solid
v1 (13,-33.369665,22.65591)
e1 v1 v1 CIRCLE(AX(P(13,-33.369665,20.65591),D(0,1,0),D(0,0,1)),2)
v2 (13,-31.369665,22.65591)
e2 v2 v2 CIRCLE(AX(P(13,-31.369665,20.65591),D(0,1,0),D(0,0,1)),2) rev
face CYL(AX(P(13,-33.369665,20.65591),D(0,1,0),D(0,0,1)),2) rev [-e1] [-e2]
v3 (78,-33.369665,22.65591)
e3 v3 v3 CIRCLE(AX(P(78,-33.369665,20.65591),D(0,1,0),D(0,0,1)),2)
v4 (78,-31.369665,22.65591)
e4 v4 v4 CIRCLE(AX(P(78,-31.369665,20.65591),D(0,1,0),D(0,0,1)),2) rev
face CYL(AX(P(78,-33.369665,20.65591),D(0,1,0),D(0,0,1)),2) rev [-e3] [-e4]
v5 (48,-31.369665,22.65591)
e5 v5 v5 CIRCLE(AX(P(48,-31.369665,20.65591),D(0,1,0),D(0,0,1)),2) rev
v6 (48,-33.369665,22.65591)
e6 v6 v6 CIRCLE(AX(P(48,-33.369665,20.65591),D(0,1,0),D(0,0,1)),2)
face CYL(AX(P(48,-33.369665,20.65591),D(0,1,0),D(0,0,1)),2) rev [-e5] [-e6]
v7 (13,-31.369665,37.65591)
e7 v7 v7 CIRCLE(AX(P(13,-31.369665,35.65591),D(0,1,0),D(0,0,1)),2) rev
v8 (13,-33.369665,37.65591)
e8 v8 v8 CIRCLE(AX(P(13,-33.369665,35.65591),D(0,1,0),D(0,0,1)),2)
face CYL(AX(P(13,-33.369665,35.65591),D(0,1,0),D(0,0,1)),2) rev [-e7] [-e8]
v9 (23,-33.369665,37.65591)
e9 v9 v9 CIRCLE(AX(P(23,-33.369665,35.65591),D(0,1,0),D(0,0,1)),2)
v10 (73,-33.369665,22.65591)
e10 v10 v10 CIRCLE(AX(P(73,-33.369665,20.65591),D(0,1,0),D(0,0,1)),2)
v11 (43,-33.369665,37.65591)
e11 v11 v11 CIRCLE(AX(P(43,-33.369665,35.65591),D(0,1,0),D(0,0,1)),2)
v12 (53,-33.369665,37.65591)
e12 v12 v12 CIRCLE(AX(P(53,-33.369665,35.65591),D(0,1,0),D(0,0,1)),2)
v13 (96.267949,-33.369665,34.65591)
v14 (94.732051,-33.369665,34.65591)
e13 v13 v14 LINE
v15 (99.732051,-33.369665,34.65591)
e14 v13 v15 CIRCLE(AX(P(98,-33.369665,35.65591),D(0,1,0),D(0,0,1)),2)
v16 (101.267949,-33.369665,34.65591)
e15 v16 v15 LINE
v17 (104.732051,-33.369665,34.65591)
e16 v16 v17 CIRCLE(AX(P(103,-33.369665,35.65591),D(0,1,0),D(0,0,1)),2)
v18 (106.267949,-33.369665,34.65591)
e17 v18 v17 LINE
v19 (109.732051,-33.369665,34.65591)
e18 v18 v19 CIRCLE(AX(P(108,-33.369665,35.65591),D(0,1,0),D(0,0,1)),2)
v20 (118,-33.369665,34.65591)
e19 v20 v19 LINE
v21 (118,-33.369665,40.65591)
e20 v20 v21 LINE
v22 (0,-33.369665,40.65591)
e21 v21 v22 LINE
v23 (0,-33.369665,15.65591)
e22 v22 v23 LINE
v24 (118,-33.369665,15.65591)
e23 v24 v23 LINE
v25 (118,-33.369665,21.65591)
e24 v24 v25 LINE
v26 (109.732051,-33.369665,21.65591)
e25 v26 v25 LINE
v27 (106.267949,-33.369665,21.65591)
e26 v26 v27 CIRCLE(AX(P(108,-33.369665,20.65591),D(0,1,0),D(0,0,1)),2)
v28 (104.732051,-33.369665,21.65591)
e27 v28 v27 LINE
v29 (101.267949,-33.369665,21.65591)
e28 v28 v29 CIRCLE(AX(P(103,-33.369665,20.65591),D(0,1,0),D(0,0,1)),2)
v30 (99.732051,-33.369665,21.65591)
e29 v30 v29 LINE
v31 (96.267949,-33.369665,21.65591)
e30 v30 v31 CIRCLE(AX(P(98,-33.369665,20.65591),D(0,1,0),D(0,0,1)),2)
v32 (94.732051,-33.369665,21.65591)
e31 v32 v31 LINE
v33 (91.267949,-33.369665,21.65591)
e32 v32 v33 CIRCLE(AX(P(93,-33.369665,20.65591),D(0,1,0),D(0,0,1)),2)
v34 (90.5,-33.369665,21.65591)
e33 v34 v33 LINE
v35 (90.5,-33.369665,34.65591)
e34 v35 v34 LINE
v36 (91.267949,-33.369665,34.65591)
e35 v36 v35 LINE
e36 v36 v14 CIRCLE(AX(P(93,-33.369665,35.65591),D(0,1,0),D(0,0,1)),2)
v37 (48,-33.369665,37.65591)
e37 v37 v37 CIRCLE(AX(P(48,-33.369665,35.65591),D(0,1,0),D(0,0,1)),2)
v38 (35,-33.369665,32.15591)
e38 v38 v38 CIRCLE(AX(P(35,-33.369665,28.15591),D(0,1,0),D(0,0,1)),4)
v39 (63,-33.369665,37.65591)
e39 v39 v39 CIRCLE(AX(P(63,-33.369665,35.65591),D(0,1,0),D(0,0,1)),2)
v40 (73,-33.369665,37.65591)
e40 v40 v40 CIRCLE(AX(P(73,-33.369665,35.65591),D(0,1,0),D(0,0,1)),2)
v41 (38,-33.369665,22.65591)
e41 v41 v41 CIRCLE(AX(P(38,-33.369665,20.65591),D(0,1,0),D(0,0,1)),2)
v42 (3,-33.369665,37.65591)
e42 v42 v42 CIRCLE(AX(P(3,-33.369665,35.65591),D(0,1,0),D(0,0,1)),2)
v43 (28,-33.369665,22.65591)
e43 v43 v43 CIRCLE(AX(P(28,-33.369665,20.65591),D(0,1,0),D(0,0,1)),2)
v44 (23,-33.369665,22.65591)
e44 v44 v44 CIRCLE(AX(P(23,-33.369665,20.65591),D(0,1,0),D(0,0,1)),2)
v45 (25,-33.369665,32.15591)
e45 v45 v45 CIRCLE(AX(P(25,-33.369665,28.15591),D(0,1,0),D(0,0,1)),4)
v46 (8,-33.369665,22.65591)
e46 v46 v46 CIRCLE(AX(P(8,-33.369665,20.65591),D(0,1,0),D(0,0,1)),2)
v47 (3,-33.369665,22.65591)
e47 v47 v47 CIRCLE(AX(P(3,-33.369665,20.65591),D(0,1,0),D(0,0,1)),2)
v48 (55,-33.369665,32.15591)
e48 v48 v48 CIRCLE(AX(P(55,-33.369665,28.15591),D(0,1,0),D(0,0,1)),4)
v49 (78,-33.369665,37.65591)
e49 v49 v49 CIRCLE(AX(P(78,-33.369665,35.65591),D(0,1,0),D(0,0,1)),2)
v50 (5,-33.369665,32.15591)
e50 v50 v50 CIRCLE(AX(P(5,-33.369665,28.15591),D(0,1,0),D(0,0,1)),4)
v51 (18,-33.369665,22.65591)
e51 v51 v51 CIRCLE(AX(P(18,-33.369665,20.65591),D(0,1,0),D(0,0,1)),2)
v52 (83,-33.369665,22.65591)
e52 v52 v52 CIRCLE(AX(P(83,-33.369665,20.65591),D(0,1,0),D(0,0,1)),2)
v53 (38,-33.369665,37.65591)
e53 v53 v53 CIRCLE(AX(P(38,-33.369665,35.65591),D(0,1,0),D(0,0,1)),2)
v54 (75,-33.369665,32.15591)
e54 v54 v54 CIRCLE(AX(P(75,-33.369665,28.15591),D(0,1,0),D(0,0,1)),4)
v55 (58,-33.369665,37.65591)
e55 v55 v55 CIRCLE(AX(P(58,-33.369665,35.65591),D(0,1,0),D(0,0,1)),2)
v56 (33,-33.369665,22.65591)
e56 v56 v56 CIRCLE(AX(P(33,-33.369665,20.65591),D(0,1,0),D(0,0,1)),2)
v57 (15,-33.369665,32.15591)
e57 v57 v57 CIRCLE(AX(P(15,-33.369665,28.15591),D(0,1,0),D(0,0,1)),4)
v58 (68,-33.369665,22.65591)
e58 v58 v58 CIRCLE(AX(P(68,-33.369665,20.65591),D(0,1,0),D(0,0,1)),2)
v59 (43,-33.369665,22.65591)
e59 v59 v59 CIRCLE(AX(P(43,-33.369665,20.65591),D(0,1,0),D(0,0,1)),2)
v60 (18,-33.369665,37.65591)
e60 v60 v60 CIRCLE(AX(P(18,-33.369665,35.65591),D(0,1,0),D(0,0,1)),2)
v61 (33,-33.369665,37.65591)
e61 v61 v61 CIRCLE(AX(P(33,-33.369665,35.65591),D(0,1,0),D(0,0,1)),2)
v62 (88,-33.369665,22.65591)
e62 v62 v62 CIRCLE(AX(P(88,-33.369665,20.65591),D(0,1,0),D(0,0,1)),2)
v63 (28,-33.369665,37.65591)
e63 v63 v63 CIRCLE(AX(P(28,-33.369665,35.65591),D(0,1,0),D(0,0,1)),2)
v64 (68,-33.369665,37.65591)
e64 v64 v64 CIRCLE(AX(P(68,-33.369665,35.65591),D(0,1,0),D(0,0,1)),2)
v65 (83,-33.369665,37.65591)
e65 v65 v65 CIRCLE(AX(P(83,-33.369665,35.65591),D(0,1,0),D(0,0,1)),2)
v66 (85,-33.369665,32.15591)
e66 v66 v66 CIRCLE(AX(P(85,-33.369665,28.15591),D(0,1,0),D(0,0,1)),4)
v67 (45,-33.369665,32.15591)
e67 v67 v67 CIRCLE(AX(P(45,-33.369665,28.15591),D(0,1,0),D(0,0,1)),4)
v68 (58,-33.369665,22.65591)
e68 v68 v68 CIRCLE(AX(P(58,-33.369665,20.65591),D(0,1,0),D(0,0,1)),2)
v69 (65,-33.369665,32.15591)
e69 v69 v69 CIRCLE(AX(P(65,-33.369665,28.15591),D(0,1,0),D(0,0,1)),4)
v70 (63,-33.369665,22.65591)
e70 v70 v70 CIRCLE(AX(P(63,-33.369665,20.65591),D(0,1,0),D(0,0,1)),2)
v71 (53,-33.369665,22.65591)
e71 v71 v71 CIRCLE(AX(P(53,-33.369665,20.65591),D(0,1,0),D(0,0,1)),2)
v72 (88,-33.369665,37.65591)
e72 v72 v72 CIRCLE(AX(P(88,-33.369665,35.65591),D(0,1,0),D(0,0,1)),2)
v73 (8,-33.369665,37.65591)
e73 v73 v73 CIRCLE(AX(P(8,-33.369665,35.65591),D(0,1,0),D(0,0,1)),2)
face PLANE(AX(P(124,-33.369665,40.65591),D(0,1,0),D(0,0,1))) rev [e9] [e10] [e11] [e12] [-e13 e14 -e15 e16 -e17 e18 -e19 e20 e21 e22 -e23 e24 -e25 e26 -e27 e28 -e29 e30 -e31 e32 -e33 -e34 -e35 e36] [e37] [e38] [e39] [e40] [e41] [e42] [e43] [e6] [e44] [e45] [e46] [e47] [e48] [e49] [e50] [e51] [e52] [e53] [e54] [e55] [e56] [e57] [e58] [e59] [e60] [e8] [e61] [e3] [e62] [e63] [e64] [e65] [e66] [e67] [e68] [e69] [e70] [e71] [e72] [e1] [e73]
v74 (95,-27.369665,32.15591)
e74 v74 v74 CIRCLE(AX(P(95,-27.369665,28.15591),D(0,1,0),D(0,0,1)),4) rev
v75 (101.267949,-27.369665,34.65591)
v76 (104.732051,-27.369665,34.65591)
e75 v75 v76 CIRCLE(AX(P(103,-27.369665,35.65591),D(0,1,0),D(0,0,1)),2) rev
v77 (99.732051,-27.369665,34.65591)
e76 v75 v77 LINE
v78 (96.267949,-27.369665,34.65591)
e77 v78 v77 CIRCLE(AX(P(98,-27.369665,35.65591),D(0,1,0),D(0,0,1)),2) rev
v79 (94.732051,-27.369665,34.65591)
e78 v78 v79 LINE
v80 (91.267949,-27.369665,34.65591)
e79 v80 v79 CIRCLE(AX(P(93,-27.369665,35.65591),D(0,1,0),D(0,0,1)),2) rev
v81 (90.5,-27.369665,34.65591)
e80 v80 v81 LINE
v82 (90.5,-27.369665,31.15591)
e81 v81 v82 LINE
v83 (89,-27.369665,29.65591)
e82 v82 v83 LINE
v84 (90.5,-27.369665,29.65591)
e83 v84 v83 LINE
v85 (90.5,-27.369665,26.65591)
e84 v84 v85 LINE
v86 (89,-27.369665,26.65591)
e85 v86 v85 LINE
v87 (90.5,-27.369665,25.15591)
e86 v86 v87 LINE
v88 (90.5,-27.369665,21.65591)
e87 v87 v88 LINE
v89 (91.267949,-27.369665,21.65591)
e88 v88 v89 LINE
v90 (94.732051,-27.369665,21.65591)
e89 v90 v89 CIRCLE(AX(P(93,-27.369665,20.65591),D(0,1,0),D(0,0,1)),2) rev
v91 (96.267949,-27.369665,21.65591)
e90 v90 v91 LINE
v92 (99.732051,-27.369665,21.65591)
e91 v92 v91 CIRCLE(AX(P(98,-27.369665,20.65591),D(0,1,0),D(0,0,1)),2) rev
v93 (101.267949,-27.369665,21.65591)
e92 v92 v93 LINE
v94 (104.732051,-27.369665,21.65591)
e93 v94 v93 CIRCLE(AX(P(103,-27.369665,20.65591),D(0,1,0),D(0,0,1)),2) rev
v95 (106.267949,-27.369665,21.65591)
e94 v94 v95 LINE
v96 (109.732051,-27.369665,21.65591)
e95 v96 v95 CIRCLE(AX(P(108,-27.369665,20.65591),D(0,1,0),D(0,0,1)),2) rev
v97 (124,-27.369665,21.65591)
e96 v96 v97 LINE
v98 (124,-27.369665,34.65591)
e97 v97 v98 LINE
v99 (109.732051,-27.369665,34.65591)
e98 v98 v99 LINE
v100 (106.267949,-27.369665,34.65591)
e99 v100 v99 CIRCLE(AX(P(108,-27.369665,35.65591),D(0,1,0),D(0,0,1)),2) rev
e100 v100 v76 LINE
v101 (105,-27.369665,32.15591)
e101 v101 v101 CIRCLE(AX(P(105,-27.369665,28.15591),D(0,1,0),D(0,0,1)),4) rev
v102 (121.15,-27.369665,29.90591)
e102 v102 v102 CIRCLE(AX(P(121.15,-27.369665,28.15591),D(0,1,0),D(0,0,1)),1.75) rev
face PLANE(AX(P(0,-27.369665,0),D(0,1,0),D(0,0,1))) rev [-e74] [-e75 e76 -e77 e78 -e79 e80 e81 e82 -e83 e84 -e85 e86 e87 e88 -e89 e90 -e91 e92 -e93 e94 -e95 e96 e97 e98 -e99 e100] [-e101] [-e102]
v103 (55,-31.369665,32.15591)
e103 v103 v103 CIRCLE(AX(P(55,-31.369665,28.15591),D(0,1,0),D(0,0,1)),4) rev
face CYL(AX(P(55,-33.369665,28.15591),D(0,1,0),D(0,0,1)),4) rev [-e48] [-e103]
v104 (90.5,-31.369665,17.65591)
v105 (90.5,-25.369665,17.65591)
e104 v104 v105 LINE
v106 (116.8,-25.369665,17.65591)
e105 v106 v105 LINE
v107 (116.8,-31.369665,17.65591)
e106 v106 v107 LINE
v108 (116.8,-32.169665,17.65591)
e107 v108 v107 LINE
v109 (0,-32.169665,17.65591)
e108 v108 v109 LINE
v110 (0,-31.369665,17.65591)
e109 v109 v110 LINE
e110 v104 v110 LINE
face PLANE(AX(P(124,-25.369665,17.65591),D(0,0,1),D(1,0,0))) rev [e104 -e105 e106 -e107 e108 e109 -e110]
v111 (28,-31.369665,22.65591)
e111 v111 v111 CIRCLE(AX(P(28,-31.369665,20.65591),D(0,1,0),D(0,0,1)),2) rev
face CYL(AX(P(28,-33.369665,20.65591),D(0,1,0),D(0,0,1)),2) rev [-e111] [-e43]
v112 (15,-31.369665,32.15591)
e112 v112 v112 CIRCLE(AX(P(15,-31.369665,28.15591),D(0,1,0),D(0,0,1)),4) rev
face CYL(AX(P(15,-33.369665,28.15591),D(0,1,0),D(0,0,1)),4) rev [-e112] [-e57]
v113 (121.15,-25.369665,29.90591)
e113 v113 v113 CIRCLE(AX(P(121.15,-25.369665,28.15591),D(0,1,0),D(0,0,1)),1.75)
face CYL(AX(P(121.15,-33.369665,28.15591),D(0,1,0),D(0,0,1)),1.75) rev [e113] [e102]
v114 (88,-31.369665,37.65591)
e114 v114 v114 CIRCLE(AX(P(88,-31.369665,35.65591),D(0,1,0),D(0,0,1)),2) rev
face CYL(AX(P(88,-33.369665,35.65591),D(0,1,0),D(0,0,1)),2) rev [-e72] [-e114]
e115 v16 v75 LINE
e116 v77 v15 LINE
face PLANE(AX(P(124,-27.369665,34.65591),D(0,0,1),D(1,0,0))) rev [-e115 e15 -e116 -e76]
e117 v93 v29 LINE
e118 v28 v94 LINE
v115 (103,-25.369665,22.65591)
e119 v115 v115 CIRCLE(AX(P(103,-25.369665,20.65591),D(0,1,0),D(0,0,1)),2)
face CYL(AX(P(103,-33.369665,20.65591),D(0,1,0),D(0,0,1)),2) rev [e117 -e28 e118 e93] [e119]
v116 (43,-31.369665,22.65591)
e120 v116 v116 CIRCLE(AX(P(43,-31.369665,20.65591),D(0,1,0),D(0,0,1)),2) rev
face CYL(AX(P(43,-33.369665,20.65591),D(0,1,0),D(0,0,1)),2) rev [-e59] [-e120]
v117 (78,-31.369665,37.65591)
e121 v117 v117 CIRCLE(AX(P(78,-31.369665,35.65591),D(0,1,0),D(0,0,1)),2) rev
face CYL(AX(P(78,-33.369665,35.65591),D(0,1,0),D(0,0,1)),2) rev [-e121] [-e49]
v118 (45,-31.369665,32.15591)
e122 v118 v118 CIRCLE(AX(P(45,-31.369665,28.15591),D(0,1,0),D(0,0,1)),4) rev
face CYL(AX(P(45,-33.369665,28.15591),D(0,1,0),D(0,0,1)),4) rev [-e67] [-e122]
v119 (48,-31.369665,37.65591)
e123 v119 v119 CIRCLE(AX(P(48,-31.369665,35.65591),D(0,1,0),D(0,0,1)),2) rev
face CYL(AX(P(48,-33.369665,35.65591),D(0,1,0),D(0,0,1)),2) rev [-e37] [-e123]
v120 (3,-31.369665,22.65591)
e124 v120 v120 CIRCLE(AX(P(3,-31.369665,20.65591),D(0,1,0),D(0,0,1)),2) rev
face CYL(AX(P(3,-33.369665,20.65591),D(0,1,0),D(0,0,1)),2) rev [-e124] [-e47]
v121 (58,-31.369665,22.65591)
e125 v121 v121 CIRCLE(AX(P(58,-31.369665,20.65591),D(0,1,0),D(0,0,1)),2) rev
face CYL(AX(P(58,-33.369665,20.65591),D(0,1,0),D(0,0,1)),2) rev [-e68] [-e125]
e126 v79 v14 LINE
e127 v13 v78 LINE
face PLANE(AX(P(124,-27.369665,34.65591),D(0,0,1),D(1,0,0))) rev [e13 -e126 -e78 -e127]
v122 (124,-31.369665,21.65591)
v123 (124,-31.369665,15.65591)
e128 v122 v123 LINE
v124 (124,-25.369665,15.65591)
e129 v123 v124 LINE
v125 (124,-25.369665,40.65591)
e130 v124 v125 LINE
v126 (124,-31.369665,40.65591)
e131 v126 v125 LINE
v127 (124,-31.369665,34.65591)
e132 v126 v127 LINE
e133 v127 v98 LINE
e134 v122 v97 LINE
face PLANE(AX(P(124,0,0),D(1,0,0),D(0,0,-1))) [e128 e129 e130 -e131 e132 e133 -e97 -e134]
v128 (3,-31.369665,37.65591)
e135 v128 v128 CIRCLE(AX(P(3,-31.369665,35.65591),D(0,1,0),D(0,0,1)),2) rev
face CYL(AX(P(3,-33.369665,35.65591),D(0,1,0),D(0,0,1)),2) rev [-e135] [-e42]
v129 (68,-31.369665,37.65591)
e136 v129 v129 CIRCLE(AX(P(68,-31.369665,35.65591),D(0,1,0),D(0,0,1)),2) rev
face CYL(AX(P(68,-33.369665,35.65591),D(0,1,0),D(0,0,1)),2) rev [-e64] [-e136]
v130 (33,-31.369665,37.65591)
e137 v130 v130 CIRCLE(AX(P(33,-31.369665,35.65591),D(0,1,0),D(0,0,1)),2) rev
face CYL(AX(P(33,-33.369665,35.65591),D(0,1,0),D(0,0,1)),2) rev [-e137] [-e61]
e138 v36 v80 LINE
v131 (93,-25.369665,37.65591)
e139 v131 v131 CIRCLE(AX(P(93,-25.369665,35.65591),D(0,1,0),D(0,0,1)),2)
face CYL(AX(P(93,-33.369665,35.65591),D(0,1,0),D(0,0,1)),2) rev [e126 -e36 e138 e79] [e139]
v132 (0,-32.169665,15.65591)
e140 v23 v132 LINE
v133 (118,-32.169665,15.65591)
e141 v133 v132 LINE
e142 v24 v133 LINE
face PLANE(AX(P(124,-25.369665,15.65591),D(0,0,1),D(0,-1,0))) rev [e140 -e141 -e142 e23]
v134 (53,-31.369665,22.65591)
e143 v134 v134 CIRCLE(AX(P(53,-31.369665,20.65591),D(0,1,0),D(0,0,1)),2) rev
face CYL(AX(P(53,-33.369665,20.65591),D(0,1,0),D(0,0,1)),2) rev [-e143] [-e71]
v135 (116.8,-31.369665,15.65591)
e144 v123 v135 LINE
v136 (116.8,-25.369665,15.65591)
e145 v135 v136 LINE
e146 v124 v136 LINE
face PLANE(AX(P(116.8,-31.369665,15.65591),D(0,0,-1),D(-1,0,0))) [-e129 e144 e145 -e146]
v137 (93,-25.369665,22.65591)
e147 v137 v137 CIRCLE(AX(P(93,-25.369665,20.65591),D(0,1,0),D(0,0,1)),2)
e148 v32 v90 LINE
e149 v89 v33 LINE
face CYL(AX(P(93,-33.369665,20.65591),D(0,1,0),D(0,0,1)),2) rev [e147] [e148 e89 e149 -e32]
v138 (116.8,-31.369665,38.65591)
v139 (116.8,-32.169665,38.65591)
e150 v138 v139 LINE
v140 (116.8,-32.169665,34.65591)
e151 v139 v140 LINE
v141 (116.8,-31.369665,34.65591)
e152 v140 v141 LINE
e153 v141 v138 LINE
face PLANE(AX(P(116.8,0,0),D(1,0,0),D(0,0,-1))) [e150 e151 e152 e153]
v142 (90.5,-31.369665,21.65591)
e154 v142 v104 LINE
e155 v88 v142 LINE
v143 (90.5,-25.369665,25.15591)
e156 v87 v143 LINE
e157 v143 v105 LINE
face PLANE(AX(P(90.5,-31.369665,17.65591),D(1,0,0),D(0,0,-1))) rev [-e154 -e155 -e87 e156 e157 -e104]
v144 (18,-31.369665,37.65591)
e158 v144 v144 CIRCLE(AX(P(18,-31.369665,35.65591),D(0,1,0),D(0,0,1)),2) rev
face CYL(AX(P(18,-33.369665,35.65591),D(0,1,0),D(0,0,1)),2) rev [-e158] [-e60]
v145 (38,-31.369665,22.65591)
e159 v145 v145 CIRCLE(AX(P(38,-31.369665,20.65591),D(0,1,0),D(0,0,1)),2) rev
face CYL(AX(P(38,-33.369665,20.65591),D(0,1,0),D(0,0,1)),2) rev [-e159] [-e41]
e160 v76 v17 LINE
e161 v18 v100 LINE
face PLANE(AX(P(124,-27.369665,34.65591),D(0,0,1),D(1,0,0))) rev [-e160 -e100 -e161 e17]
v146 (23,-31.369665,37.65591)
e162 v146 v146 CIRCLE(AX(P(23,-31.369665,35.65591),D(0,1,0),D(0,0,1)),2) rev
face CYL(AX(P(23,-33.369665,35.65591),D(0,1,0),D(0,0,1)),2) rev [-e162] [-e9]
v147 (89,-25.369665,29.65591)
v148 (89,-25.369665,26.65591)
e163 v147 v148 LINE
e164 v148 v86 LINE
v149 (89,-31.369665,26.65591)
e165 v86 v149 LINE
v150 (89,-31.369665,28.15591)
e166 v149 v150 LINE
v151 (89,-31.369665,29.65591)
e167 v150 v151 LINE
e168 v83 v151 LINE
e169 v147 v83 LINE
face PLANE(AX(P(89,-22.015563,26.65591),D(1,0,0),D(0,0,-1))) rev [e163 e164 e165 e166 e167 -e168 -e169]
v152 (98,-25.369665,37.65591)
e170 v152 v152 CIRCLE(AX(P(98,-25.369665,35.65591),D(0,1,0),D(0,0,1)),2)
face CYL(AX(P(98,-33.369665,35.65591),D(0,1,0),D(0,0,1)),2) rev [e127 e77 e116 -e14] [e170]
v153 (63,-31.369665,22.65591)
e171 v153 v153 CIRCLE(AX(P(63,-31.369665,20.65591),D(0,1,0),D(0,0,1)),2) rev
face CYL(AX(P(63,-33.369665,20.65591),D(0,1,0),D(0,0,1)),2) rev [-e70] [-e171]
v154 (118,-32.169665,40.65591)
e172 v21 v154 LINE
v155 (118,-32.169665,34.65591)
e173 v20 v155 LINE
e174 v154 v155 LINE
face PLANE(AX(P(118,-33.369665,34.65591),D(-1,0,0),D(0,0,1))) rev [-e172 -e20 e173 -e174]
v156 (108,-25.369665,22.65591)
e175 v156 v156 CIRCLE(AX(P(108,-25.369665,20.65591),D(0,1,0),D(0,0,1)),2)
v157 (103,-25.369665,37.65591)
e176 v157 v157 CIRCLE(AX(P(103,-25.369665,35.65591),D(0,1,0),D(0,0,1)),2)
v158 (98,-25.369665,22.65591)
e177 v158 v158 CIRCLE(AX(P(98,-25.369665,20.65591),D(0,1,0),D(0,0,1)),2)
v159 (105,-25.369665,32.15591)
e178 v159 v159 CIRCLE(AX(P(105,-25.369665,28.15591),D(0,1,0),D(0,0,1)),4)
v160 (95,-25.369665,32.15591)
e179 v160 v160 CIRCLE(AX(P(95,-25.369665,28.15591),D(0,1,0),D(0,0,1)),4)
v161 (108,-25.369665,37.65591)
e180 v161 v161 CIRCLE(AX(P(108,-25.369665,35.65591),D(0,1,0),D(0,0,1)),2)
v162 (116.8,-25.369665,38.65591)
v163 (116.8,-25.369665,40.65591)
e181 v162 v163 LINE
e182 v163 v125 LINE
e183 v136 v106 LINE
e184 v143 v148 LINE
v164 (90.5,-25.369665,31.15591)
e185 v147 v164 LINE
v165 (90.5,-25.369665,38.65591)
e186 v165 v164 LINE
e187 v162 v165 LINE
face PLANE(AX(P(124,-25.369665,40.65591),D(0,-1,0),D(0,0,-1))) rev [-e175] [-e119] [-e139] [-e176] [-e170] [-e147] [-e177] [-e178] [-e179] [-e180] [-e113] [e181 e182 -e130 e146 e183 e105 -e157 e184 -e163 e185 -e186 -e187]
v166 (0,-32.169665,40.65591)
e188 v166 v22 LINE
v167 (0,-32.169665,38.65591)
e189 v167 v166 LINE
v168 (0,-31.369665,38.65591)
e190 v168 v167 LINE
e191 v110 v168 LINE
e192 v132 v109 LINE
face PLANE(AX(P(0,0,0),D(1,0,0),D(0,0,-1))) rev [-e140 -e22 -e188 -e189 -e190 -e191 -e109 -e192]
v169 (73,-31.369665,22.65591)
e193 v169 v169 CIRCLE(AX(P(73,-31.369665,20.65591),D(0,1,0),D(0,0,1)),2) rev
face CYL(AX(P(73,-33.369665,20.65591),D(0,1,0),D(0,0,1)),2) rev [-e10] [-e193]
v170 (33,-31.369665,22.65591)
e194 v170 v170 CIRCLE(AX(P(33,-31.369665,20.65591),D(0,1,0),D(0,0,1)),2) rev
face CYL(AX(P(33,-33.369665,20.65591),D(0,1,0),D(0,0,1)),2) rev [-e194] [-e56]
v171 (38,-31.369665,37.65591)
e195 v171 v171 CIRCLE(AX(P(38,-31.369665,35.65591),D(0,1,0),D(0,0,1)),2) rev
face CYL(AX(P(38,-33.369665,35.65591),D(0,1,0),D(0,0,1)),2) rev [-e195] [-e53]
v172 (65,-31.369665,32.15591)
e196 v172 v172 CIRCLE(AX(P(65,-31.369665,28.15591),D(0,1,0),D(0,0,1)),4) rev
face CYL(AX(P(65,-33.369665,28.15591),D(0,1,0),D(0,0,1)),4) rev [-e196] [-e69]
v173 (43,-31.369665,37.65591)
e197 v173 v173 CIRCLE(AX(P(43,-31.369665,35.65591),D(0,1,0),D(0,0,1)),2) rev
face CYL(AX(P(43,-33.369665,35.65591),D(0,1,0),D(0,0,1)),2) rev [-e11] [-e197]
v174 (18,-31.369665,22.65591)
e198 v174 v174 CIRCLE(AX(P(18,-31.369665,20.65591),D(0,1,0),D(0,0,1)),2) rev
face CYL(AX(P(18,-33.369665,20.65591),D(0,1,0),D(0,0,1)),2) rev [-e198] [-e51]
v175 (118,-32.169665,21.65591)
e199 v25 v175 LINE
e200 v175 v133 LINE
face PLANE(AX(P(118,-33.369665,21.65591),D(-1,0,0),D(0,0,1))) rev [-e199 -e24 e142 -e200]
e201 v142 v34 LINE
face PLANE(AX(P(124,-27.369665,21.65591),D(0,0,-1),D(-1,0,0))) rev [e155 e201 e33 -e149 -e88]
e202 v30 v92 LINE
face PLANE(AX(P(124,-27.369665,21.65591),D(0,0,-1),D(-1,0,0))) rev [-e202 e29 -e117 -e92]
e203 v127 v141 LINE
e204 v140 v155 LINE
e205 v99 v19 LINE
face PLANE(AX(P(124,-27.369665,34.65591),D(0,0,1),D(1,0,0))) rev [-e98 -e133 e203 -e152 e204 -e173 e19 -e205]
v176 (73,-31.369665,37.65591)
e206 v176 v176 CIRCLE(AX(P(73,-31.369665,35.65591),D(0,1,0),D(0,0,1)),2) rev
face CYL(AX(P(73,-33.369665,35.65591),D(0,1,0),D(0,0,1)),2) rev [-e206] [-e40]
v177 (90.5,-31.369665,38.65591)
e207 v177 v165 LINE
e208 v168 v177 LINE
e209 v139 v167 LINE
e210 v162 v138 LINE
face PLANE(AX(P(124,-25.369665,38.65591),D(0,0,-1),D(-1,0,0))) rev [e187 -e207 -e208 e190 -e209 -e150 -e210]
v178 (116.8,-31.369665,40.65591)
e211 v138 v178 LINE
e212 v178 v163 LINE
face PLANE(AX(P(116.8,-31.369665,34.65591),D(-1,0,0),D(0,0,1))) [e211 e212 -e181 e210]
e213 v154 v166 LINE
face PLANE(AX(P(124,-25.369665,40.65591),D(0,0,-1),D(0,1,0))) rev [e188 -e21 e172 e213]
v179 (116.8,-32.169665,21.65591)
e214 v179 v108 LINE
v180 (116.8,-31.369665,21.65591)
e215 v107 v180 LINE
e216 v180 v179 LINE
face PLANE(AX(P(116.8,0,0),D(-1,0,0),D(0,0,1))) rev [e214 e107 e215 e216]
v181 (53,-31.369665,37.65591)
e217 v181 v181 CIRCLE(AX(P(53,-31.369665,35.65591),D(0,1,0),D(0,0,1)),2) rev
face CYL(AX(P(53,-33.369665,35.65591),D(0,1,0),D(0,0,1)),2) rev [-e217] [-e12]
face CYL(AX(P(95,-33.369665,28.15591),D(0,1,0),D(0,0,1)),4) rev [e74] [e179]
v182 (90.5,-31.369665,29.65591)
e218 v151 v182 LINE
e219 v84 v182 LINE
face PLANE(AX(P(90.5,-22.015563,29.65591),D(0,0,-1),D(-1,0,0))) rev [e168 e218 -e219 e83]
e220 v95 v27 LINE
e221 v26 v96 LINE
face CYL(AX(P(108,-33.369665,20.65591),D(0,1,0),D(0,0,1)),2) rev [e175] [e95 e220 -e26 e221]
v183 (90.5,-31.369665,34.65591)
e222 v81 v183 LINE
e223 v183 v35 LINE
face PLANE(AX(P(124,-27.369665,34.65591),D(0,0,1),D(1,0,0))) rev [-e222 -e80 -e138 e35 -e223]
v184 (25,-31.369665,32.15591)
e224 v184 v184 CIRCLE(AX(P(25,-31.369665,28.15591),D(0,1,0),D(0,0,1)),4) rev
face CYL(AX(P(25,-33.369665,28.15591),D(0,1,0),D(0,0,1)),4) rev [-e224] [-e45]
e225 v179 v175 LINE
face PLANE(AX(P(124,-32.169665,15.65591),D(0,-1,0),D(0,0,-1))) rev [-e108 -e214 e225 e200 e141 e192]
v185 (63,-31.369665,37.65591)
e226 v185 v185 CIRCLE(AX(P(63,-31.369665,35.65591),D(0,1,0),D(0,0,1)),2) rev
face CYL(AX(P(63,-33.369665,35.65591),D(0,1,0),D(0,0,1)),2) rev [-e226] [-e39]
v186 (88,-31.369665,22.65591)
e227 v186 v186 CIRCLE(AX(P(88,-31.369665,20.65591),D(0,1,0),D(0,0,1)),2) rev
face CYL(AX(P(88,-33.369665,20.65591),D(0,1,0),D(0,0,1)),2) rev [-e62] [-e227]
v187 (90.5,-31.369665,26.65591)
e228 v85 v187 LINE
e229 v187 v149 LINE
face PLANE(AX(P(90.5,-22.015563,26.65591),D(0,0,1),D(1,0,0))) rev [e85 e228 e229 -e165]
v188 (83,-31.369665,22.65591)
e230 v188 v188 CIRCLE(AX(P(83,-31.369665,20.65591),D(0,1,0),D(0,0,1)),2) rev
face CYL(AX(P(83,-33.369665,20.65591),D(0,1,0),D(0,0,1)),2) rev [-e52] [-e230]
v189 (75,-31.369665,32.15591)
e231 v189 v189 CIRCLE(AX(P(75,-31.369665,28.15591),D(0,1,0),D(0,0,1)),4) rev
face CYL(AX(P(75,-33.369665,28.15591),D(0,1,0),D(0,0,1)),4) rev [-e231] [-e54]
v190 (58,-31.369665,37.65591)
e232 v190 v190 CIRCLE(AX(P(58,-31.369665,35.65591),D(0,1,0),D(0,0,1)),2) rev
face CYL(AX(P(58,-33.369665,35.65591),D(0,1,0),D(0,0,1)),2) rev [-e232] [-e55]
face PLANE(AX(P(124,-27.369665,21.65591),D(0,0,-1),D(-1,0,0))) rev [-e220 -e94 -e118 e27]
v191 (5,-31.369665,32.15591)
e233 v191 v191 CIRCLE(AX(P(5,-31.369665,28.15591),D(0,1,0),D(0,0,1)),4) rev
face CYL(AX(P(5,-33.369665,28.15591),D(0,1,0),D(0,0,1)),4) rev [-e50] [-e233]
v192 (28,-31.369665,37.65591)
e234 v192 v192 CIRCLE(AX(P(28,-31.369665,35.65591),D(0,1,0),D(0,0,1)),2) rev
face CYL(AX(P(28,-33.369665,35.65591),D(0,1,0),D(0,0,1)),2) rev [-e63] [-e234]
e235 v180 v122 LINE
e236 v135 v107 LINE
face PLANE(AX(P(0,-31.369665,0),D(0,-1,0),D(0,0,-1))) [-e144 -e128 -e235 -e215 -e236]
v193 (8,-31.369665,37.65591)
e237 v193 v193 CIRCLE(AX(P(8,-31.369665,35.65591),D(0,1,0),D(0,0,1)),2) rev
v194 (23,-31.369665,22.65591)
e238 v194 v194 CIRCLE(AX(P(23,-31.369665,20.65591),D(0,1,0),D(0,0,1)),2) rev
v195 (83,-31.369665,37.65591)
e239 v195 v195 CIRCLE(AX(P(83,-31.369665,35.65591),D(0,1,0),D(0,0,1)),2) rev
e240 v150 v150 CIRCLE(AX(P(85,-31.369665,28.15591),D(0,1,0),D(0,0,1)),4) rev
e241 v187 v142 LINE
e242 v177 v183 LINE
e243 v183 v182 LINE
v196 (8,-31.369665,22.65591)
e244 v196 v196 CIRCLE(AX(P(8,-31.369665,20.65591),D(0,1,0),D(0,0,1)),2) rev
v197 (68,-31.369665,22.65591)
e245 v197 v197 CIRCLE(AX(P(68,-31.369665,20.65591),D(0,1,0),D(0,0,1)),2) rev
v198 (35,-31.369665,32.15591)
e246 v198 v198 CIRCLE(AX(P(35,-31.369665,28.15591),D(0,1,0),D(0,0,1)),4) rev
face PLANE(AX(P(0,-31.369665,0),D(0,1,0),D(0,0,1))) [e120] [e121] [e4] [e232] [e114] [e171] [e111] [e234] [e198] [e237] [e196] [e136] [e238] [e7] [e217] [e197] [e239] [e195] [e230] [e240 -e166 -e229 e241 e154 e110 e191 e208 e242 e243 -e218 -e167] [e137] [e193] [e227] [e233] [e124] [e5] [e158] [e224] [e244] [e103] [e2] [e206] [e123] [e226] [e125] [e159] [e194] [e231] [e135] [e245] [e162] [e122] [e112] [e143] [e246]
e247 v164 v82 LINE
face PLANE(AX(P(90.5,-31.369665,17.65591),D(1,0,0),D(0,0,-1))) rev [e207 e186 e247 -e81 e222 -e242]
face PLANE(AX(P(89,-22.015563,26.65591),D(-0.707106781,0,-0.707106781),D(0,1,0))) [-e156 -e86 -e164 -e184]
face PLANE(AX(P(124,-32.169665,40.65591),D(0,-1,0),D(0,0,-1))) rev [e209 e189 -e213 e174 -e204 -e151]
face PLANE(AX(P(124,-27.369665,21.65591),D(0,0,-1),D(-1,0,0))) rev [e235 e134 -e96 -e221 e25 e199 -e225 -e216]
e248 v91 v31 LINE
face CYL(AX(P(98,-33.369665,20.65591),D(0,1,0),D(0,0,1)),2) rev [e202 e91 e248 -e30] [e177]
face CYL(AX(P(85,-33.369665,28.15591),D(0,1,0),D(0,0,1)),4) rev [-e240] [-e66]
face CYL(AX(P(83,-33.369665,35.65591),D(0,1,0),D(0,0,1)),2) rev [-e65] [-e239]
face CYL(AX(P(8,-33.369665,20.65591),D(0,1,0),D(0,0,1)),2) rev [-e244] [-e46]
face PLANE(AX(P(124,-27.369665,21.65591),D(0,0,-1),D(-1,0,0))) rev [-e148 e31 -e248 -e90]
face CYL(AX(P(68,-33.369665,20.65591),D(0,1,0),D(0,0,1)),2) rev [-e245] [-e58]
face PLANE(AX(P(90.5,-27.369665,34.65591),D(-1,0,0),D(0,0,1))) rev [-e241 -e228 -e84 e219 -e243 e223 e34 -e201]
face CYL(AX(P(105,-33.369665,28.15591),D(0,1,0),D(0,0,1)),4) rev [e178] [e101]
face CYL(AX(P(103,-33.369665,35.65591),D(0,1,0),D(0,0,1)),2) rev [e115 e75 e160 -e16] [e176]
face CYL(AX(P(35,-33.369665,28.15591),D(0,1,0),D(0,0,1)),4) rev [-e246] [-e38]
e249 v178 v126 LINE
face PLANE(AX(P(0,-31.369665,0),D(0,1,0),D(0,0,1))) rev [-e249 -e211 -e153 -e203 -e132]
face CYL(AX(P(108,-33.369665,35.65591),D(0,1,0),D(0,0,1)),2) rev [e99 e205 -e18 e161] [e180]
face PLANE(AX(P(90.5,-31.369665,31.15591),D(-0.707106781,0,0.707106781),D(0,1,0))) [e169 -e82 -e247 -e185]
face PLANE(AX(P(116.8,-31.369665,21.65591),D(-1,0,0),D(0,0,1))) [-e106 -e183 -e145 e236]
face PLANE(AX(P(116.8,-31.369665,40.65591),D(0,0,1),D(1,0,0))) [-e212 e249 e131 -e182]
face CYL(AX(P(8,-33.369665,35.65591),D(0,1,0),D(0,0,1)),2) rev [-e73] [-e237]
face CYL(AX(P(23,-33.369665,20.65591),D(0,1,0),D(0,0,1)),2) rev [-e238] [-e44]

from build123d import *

# Parameters (mm, degrees)
SKIZZE1_W                       = 25
SKIZZE1_H                       = 8
AUFSATZ_LINEAR_AUSTRAGEN1_DEPTH = 124
SKIZZE2_W                       = 2
SKIZZE2_H                       = 6.8
SCHNITT_LINEAR_AUSTRAGEN1_DEPTH = 135.693866119
SKIZZE3_R                       = 1.75
SKIZZE3_W                       = 6
SKIZZE3_H                       = 6
SCHNITT_LINEAR_AUSTRAGEN2_DEPTH = 131.739829541
SKIZZE4_W                       = 4
SKIZZE4_H                       = 6.8
SCHNITT_LINEAR_AUSTRAGEN3_DEPTH = 1.2
SKIZZE5_R                       = 2
SKIZZE5_R_2                     = 4
SCHNITT_LINEAR_AUSTRAGEN4_DEPTH = 131.739829541
LINEARES_MUSTER1_COUNT          = 11
LINEARES_MUSTER1_PITCH          = 10
SKIZZE6_W                       = 90.5
SKIZZE6_H                       = 21
SCHNITT_LINEAR_AUSTRAGEN5_DEPTH = 6
SKIZZE7_W                       = 33.5
SKIZZE7_H                       = 13
SCHNITT_LINEAR_AUSTRAGEN6_DEPTH = 6
SKIZZE8_W                       = 7.2
SKIZZE8_H                       = 6
AUFSATZ_LINEAR_AUSTRAGEN2_DEPTH = 6
AUFSATZ_LINEAR_AUSTRAGEN3_REACH = 132.633
SKIZZE9_W                       = 1.5
SKIZZE9_H                       = 3
FASE1_SIZE                      = 1.5


with BuildPart() as part:
    # Skizze1 → Aufsatz-Linear austragen1 (new body)
    with BuildSketch(Plane(origin=(0, 0, 0), x_dir=(0, 0, -1), z_dir=(1, 0, 0))):
        with Locations((-28.15591013, -29.369664989)):
            Rectangle(SKIZZE1_W, SKIZZE1_H)
    extrude(amount=AUFSATZ_LINEAR_AUSTRAGEN1_DEPTH)

    # Skizze2 → Schnitt-Linear austragen1 (cut, through all)
    with BuildSketch(Plane.ZY):
        with Locations((16.65591013, -28.769664989)):
            Rectangle(SKIZZE2_W, SKIZZE2_H)
        with Locations((39.65591013, -28.769664989)):
            Rectangle(SKIZZE2_W, SKIZZE2_H)
    extrude(amount=-SCHNITT_LINEAR_AUSTRAGEN1_DEPTH, mode=Mode.SUBTRACT)

    # Skizze3 → Schnitt-Linear austragen2 (cut, through all)
    with BuildSketch(Plane(origin=(0, -25.369664989, 0), x_dir=(1, 0, 0), z_dir=(0, 1, 0))):
        with Locations(Location((121.15, -28.15591013, 0), (0, 0, 270))):
            Circle(SKIZZE3_R)
        with Locations((121, -18.65591013)):
            Rectangle(SKIZZE3_W, SKIZZE3_H)
        with Locations((121, -37.65591013)):
            Rectangle(SKIZZE3_W, SKIZZE3_H)
    extrude(amount=-SCHNITT_LINEAR_AUSTRAGEN2_DEPTH, mode=Mode.SUBTRACT)

    # Skizze4 → Schnitt-Linear austragen3 (cut)
    with BuildSketch(Plane(origin=(118, 0, 0), x_dir=(0, 0, -1), z_dir=(1, 0, 0))):
        with Locations((-36.65591013, -28.769664989)):
            Rectangle(SKIZZE4_W, SKIZZE4_H)
        with Locations((-19.65591013, -28.769664989)):
            Rectangle(SKIZZE4_W, SKIZZE4_H)
    extrude(amount=-SCHNITT_LINEAR_AUSTRAGEN3_DEPTH, mode=Mode.SUBTRACT)

    # Skizze5 → Schnitt-Linear austragen4 (cut, through all)
    with BuildSketch(Plane(origin=(0, -25.369664989, 0), x_dir=(1, 0, 0), z_dir=(0, 1, 0))):
        with Locations(Location((3, -20.65591013, 0), (0, 0, 270))):
            Circle(SKIZZE5_R)
        with Locations(Location((5, -28.15591013, 0), (0, 0, 270))):
            Circle(SKIZZE5_R_2)
        with Locations(Location((3, -35.65591013, 0), (0, 0, 270))):
            Circle(SKIZZE5_R)
        with Locations(Location((8, -35.65591013, 0), (0, 0, 270))):
            Circle(SKIZZE5_R)
        with Locations(Location((8, -20.65591013, 0), (0, 0, 270))):
            Circle(SKIZZE5_R)
    schnitt_linear_austragen4 = extrude(amount=-SCHNITT_LINEAR_AUSTRAGEN4_DEPTH, mode=Mode.SUBTRACT)

    # Lineares Muster1: Schnitt-Linear austragen4 ×11
    with Locations(*[(i * LINEARES_MUSTER1_PITCH, 0, 0) for i in range(1, LINEARES_MUSTER1_COUNT)]):
        add(schnitt_linear_austragen4, mode=Mode.SUBTRACT)

    # Skizze6 → Schnitt-Linear austragen5 (cut)
    with BuildSketch(Plane(origin=(0, -25.369664989, 0), x_dir=(1, 0, 0), z_dir=(0, 1, 0))):
        with Locations((45.25, -28.15591013)):
            Rectangle(SKIZZE6_W, SKIZZE6_H)
    extrude(amount=-SCHNITT_LINEAR_AUSTRAGEN5_DEPTH, mode=Mode.SUBTRACT)

    # Skizze7 → Schnitt-Linear austragen6 (cut)
    with BuildSketch(Plane.XZ.offset(33.369664989)):
        with Locations((107.25, 28.15591013)):
            Rectangle(SKIZZE7_W, SKIZZE7_H)
    extrude(amount=-SCHNITT_LINEAR_AUSTRAGEN6_DEPTH, mode=Mode.SUBTRACT)

    # Skizze8 → Aufsatz-Linear austragen2 (add)
    with BuildSketch(Plane(origin=(0, -25.369664989, 0), x_dir=(1, 0, 0), z_dir=(0, 1, 0))):
        with Locations((120.4, -18.65591013)):
            Rectangle(SKIZZE8_W, SKIZZE8_H)
        with Locations((120.4, -37.65591013)):
            Rectangle(SKIZZE8_W, SKIZZE8_H)
    extrude(amount=-AUFSATZ_LINEAR_AUSTRAGEN2_DEPTH)

    # Aufsatz-Linear austragen3: up to this face of the body (flat: up to its plane)
    aufsatz_linear_austragen3_end = Plane(part.part.faces().sort_by_distance((110.417879916, -25.369664989, 28.15591013))[0])
    # Skizze9 → Aufsatz-Linear austragen3 (add, up to the picked face)
    with BuildSketch(Plane(origin=(0, -31.369664989, 0), x_dir=(1, 0, 0), z_dir=(0, 1, 0)), mode=Mode.PRIVATE) as aufsatz_linear_austragen3_sk1:
        with Locations((89.75, -28.15591013)):
            Rectangle(SKIZZE9_W, SKIZZE9_H)
    aufsatz_linear_austragen3_tool1 = split(extrude(aufsatz_linear_austragen3_sk1.sketch, amount=AUFSATZ_LINEAR_AUSTRAGEN3_REACH, mode=Mode.PRIVATE), bisect_by=aufsatz_linear_austragen3_end, keep=Keep.BOTH, mode=Mode.PRIVATE)
    add(aufsatz_linear_austragen3_tool1.solids().sort_by(Axis((89.75, -31.369665, 28.15591), (0, 1, 0)))[0])

    # Fase1
    fase1_edges = [part.edges().sort_by_distance(p)[0] for p in [
        (90.5, -26.369664989, 29.65591013),
        (90.5, -26.369664989, 26.65591013),
    ]]
    chamfer(fase1_edges, length=FASE1_SIZE - 0.0001)  # a hair under: the kernel refuses the full size


solid = part.part
